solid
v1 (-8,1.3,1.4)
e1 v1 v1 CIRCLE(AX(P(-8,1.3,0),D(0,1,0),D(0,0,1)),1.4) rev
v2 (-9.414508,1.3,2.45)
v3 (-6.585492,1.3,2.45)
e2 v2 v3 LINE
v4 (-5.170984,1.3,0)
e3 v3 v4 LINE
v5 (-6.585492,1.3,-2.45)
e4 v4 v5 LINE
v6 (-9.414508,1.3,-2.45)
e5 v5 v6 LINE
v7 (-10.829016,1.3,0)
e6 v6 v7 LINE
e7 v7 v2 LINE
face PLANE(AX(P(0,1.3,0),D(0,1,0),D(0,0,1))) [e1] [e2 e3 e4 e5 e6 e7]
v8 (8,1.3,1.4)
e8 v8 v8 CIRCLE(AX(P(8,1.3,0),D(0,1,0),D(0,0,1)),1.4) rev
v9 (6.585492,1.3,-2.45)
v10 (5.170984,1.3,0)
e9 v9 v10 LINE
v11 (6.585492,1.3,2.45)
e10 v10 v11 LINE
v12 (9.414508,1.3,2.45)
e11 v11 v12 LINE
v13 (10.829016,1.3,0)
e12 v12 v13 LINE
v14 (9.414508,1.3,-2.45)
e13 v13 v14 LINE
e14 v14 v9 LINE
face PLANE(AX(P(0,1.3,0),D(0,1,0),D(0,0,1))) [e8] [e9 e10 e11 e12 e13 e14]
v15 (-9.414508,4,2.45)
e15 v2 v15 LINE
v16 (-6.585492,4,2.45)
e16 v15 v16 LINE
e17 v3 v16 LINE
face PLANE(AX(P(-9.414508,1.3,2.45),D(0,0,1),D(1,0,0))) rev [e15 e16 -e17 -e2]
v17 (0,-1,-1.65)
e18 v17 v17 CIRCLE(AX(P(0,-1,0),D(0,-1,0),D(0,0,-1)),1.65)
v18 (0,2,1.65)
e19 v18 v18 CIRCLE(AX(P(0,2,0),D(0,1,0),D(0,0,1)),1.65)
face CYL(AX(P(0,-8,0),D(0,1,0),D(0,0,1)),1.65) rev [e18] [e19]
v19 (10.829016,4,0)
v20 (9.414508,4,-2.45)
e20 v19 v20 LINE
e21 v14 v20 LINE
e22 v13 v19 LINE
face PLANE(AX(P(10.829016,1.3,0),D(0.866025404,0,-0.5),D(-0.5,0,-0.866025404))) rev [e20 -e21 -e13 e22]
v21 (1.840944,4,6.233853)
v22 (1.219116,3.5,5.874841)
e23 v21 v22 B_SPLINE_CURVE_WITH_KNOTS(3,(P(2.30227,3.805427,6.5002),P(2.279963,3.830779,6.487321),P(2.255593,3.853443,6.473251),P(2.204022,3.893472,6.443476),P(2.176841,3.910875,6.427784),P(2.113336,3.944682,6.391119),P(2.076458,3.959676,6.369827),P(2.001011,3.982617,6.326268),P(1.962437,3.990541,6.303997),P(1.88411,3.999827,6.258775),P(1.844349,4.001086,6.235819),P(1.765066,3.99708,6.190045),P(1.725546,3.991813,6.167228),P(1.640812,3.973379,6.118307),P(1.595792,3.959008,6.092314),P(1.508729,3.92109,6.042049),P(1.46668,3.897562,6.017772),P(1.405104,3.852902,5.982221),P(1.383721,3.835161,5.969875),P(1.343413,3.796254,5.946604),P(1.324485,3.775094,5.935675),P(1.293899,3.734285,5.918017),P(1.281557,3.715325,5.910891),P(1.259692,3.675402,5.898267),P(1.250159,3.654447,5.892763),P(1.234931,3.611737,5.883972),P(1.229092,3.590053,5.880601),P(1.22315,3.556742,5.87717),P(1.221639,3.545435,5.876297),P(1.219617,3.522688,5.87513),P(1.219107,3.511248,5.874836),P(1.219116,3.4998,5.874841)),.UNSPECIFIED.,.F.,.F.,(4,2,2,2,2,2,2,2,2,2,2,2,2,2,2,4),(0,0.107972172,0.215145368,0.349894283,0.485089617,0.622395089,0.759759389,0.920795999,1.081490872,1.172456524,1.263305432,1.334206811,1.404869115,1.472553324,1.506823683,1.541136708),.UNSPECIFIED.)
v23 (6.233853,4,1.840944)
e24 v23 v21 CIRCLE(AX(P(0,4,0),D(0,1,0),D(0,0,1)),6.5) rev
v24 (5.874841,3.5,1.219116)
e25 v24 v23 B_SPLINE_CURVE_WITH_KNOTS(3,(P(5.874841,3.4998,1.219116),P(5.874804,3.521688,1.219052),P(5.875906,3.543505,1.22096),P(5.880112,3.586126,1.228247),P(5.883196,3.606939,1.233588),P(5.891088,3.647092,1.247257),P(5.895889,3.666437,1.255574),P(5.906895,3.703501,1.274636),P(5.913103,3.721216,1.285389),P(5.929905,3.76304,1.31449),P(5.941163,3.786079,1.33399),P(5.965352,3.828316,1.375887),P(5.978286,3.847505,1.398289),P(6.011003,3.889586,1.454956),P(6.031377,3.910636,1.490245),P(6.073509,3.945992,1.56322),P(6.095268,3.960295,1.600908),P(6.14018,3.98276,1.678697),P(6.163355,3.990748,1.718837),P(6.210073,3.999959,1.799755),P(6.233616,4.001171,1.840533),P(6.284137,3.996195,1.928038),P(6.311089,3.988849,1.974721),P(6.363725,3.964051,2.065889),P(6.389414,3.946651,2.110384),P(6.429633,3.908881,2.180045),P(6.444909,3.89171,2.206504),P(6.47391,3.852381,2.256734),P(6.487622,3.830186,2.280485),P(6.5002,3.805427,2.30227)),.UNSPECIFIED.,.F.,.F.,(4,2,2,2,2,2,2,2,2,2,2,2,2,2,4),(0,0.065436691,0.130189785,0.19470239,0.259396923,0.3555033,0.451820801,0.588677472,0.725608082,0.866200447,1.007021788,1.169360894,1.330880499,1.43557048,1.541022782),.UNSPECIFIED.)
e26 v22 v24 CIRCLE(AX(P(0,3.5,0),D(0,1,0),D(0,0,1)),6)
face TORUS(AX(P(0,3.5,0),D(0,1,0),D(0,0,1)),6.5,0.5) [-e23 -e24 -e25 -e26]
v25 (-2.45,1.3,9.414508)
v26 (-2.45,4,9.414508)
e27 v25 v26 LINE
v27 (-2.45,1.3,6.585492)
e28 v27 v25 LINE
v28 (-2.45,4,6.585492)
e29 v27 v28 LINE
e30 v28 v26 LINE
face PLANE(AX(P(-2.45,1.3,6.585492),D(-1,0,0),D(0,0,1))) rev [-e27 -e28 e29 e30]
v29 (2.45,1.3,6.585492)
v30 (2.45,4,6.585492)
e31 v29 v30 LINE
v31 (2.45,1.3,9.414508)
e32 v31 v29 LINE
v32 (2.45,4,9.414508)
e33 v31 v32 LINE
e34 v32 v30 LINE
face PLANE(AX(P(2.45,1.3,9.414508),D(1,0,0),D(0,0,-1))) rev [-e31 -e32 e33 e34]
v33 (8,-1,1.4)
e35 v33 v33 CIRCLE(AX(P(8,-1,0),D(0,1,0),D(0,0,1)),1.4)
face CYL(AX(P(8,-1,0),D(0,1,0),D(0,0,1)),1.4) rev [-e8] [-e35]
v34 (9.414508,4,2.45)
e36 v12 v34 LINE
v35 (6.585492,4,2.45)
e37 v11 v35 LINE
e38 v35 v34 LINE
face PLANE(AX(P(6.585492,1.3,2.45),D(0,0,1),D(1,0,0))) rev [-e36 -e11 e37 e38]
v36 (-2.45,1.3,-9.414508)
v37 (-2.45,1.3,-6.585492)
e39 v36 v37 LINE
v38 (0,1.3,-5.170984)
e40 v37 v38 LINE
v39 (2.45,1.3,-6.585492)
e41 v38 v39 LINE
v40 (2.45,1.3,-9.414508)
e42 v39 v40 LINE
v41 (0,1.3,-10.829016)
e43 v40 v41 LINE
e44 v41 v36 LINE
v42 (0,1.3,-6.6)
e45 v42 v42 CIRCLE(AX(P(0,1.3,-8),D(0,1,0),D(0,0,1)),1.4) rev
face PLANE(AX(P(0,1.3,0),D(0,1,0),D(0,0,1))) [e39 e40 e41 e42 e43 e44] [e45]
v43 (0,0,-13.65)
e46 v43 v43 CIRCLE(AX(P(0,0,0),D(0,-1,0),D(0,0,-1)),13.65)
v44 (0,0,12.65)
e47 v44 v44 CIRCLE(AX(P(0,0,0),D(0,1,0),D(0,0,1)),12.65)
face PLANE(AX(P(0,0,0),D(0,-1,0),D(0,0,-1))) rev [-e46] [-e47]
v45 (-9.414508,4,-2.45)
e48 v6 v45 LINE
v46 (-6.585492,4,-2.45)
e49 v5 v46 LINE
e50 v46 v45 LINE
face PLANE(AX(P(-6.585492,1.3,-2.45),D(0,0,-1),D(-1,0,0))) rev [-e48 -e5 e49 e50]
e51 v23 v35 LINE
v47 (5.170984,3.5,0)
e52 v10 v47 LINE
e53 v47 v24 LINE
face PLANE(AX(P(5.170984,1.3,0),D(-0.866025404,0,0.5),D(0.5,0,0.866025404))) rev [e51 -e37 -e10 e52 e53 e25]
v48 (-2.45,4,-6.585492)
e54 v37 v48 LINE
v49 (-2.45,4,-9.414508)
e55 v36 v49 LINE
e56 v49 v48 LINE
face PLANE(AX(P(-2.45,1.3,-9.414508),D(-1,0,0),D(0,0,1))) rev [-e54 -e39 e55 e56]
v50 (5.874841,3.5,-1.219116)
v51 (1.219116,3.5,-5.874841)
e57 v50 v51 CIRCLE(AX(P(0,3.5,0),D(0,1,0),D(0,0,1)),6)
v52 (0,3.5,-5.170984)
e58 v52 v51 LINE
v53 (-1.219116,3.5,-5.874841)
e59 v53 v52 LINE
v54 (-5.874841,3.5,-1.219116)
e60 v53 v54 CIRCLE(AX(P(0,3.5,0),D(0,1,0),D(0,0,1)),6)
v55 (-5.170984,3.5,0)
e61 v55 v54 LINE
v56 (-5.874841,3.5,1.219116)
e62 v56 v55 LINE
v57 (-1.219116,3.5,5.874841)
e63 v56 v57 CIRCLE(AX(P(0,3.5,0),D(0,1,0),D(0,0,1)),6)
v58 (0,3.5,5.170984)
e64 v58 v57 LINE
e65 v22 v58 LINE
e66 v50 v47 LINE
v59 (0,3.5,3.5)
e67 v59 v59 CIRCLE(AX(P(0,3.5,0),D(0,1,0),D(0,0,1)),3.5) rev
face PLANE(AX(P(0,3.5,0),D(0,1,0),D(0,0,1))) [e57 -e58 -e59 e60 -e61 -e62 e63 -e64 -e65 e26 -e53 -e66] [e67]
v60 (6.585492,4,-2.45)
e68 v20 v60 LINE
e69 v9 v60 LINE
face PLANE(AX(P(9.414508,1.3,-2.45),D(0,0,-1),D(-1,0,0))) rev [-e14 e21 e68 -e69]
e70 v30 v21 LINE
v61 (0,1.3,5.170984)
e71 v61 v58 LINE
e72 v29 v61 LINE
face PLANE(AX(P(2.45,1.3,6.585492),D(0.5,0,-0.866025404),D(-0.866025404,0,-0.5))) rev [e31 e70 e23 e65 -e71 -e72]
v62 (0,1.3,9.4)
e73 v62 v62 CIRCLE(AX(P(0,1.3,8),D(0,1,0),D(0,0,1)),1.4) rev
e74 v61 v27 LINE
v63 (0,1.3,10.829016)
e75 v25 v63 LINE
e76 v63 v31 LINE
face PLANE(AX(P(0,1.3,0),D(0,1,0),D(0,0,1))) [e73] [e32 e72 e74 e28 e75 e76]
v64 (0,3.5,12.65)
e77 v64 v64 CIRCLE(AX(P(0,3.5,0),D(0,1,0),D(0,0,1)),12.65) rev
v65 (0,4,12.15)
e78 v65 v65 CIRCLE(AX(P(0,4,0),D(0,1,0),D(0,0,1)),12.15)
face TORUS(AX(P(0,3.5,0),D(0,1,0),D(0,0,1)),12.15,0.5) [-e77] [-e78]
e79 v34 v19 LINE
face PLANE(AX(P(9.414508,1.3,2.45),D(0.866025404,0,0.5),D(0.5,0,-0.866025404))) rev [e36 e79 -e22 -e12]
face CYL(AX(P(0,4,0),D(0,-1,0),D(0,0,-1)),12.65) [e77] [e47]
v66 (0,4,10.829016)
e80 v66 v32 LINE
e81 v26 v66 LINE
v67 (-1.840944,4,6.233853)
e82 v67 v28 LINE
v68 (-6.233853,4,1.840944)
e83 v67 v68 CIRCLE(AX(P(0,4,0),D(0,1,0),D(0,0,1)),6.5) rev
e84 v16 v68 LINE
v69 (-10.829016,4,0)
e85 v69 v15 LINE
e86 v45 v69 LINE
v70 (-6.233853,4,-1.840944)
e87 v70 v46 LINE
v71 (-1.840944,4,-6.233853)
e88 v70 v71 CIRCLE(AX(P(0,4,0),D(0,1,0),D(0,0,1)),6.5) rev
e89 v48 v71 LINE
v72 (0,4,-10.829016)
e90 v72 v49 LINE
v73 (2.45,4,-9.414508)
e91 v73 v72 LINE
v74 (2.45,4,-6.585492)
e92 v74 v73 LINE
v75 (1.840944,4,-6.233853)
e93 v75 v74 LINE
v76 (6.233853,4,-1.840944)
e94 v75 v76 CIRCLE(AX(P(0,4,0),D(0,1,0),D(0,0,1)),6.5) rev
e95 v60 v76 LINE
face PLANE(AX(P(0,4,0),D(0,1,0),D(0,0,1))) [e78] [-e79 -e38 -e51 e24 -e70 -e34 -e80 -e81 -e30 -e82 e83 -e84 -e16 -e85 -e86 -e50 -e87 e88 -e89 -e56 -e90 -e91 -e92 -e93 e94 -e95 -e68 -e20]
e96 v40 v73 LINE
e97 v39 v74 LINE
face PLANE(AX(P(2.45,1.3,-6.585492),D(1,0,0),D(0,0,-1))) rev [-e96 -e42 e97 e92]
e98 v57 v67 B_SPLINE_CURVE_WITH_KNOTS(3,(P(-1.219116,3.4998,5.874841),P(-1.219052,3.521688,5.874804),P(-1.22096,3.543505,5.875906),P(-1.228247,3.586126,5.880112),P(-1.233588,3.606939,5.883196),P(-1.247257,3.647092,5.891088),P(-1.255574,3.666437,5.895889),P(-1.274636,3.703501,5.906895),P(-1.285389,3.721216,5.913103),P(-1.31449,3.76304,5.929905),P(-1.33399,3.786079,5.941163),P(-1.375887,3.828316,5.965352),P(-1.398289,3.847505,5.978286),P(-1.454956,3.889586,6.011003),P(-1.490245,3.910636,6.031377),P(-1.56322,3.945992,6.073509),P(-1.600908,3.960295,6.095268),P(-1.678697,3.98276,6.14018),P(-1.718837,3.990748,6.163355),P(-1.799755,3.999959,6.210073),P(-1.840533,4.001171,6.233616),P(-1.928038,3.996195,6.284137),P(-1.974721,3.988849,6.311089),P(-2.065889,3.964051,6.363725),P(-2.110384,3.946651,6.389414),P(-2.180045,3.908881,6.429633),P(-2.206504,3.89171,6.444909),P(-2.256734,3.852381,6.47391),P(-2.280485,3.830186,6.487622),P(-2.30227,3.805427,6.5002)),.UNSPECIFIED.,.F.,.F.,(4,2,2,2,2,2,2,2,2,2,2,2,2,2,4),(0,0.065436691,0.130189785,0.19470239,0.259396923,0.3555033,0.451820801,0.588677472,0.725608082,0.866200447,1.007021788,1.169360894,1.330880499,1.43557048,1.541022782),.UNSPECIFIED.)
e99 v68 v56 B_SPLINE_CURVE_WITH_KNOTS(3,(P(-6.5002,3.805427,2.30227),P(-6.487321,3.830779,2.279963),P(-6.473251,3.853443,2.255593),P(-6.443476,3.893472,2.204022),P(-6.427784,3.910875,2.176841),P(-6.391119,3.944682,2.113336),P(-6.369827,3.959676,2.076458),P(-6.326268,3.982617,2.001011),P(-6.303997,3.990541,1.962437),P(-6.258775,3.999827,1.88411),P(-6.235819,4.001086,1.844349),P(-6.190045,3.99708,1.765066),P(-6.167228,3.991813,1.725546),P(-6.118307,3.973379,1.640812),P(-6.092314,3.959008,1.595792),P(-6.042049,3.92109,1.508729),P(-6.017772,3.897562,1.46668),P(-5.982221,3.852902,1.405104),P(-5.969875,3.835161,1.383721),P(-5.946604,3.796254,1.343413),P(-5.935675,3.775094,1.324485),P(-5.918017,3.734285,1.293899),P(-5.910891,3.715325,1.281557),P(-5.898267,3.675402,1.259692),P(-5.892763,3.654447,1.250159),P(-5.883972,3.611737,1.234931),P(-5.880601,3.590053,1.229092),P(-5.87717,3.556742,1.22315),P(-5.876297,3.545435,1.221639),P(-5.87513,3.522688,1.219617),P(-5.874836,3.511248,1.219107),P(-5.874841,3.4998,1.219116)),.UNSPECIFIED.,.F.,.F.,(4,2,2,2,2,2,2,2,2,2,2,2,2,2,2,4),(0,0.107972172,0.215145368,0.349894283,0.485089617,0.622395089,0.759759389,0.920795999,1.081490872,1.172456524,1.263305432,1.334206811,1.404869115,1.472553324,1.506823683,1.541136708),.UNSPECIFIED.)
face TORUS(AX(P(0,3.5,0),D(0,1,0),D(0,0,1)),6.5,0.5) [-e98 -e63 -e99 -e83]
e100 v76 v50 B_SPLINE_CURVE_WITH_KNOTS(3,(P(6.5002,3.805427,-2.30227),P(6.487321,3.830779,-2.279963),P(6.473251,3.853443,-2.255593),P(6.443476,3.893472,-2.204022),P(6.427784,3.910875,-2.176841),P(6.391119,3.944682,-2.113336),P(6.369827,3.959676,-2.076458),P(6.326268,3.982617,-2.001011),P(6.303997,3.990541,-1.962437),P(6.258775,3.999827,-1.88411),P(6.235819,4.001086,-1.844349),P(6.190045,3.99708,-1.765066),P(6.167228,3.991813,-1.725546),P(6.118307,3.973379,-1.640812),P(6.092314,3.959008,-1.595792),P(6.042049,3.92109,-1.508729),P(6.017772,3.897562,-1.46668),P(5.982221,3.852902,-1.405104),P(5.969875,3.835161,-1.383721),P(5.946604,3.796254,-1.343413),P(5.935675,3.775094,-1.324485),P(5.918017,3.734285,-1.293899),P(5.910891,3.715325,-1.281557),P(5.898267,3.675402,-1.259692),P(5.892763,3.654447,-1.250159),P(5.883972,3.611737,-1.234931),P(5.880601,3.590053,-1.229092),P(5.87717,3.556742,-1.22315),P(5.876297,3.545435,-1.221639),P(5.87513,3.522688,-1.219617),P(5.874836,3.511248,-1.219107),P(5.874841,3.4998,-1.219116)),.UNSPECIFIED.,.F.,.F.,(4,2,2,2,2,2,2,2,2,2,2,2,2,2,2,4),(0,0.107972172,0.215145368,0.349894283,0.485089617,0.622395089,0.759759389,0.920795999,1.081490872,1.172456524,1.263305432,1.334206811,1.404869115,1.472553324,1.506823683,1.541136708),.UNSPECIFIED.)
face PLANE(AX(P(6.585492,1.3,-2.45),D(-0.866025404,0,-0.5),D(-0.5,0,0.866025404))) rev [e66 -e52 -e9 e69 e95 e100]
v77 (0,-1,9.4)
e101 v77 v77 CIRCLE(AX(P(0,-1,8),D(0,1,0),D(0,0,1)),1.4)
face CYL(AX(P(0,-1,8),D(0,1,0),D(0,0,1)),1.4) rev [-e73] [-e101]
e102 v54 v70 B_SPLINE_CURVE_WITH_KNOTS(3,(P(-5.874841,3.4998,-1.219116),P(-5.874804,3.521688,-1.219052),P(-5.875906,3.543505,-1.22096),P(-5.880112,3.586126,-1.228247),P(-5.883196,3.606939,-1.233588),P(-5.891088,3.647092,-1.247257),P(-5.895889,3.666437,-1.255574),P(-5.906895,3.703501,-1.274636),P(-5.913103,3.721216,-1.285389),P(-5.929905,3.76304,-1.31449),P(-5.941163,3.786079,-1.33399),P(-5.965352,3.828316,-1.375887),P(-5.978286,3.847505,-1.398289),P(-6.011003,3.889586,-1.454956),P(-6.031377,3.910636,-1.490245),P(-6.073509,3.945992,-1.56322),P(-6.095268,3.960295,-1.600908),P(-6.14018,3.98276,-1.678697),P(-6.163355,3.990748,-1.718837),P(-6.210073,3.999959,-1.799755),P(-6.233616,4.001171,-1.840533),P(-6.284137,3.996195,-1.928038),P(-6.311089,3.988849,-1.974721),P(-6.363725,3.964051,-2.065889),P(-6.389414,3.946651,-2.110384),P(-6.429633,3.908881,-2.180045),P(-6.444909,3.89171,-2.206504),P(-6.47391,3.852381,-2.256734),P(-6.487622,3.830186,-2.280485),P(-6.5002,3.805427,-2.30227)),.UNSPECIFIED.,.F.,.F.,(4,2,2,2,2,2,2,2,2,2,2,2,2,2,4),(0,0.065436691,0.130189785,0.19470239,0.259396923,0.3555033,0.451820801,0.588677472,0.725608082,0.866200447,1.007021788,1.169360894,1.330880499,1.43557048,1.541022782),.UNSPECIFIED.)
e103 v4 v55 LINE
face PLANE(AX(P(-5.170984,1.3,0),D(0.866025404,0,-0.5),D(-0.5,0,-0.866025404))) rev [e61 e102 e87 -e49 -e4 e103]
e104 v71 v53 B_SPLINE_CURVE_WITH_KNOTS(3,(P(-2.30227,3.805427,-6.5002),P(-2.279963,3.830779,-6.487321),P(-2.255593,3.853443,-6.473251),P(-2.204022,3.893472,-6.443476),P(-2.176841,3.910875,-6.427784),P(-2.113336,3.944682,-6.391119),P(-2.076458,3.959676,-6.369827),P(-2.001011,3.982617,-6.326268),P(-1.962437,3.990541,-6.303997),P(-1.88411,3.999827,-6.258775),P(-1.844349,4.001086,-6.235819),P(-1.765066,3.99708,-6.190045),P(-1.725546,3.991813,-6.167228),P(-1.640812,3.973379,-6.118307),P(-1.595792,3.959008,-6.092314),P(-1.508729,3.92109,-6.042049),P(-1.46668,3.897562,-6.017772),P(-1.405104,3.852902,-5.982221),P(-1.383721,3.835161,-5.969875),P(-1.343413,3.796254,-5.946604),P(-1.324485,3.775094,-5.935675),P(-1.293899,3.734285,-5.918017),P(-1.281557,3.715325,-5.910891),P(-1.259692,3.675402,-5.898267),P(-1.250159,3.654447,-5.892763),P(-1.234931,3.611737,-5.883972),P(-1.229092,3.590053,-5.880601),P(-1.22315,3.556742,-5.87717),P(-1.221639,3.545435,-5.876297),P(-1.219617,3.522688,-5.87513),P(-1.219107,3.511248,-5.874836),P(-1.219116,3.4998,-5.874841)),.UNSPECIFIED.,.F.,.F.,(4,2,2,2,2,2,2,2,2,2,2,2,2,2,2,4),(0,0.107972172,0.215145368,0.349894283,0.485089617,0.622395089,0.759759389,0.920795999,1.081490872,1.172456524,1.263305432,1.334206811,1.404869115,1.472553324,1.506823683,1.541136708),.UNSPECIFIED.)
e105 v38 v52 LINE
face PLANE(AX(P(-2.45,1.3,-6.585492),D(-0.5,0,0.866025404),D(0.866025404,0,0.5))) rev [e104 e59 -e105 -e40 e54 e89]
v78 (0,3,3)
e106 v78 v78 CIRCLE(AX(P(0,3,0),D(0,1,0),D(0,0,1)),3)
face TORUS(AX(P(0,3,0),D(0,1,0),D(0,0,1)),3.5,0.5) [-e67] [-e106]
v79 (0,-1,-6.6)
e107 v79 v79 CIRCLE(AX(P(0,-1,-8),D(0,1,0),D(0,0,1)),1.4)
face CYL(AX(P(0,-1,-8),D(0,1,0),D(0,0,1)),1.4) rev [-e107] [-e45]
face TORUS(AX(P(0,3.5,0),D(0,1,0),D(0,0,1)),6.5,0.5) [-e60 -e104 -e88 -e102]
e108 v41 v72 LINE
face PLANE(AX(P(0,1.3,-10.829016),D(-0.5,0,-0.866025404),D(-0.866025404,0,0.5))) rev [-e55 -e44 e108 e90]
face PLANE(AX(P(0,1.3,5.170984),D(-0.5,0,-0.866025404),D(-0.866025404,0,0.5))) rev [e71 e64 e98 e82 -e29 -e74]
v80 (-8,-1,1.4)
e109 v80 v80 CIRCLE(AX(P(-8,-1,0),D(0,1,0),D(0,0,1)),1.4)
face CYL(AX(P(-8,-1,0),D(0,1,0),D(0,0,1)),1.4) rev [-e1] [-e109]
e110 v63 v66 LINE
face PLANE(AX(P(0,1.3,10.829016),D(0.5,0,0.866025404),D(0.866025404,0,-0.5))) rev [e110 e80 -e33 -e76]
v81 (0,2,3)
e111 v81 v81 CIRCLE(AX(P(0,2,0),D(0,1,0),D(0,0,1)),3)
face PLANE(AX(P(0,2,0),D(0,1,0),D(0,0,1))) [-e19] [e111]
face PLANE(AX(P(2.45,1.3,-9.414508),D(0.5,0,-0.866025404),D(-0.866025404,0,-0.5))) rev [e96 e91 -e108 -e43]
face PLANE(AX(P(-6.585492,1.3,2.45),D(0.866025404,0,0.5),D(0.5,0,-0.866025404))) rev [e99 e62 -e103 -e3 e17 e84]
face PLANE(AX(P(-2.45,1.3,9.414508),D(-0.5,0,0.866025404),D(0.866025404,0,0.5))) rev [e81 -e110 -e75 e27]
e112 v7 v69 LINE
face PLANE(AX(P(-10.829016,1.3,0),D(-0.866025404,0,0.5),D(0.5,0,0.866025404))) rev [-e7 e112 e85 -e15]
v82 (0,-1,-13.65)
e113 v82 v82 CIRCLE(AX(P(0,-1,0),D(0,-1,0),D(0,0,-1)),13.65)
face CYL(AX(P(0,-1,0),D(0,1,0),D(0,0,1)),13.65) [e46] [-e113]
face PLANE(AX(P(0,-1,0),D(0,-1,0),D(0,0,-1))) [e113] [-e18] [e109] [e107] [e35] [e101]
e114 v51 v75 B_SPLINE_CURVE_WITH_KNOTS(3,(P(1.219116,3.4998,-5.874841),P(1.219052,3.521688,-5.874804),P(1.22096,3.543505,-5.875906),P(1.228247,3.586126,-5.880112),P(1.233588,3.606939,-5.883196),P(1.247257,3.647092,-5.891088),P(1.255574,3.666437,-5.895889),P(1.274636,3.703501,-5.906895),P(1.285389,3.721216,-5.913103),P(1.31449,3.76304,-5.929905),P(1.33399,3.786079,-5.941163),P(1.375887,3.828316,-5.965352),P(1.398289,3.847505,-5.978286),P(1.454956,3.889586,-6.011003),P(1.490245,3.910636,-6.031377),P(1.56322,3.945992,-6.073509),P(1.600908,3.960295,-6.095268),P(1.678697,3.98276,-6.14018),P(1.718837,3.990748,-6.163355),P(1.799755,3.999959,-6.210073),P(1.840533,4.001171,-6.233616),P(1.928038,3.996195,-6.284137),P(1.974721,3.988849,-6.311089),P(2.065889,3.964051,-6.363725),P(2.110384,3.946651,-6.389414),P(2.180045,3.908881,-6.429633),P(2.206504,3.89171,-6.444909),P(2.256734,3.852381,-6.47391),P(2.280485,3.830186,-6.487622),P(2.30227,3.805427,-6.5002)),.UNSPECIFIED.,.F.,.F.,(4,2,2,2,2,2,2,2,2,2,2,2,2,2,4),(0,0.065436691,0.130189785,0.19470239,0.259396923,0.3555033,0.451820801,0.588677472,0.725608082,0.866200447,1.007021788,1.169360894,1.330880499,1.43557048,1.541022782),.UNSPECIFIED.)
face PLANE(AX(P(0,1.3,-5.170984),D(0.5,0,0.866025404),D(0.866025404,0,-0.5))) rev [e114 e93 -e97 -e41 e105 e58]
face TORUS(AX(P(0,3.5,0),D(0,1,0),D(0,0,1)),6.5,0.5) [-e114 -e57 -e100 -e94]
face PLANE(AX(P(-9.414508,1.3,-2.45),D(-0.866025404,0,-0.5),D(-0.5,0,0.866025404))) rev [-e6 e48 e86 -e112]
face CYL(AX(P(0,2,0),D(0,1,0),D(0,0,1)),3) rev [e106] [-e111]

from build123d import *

# Parameters (mm, degrees)
SKETCH1_R           = 12.65
BOSS_EXTRUDE1_DEPTH = 4
SKETCH4_R           = 6
CUT_EXTRUDE3_DEPTH  = 0.5
SKETCH5_R           = 3
CUT_EXTRUDE4_DEPTH  = 1.5
FILLET1_R           = 0.5
FILLET2_R           = 0.5
FILLET3_R           = 0.5
SKETCH7_R           = 13.65
BOSS_EXTRUDE2_DEPTH = 1
SKETCH8_R           = 1.4
CUT_EXTRUDE6_DEPTH  = 20.941038087
CUT_EXTRUDE7_DEPTH  = 2.7
SKETCH16_R          = 1.65
CUT_EXTRUDE8_DEPTH  = 10


with BuildPart() as part:
    # Sketch1 → Boss-Extrude1 (new body)
    with BuildSketch(Plane(origin=(0, 0, 0), x_dir=(1, 0, 0), z_dir=(0, 1, 0))):
        with Locations(Location((0, 0, 0), (0, 0, 270))):
            Circle(SKETCH1_R)
    extrude(amount=BOSS_EXTRUDE1_DEPTH)

    # Sketch4 → Cut-Extrude3 (cut)
    with BuildSketch(Plane(origin=(0, 4, 0), x_dir=(1, 0, 0), z_dir=(0, 1, 0))):
        with Locations(Location((0, 0, 0), (0, 0, 270))):
            Circle(SKETCH4_R)
    extrude(amount=-CUT_EXTRUDE3_DEPTH, mode=Mode.SUBTRACT)

    # Sketch5 → Cut-Extrude4 (cut)
    with BuildSketch(Plane(origin=(0, 3.5, 0), x_dir=(1, 0, 0), z_dir=(0, 1, 0))):
        with Locations(Location((0, 0, 0), (0, 0, 270))):
            Circle(SKETCH5_R)
    extrude(amount=-CUT_EXTRUDE4_DEPTH, mode=Mode.SUBTRACT)

    # Fillet1
    fillet1_edges = [part.edges().sort_by_distance(p)[0] for p in [
        (0, 4, -6),
    ]]
    fillet(fillet1_edges, radius=FILLET1_R - 0.0001)  # a hair under: the kernel refuses the full size

    # Fillet2
    fillet2_edges = [part.edges().sort_by_distance(p)[0] for p in [
        (0, 3.5, -3),
    ]]
    fillet(fillet2_edges, radius=FILLET2_R)

    # Fillet3
    fillet3_edges = [part.edges().sort_by_distance(p)[0] for p in [
        (0, 4, -12.65),
    ]]
    fillet(fillet3_edges, radius=FILLET3_R)

    # Sketch7 → Boss-Extrude2 (add)
    with BuildSketch(Plane.XZ):
        with Locations(Location((0, 0, 0), (0, 0, 270))):
            Circle(SKETCH7_R)
    extrude(amount=BOSS_EXTRUDE2_DEPTH)

    # Sketch8 → Cut-Extrude6 (cut, through all)
    with BuildSketch(Plane(origin=(0, 4, 0), x_dir=(1, 0, 0), z_dir=(0, 1, 0))):
        with Locations(Location((0, 8, 0), (0, 0, 270))):
            Circle(SKETCH8_R)
        with Locations(Location((8, 0, 0), (0, 0, 270))):
            Circle(SKETCH8_R)
        with Locations(Location((0, -8, 0), (0, 0, 270))):
            Circle(SKETCH8_R)
        with Locations(Location((-8, 0, 0), (0, 0, 270))):
            Circle(SKETCH8_R)
    extrude(amount=-CUT_EXTRUDE6_DEPTH, mode=Mode.SUBTRACT)

    # Sketch15 → Cut-Extrude7 (cut)
    with BuildSketch(Plane(origin=(0, 4, 0), x_dir=(1, 0, 0), z_dir=(0, 1, 0))):
        Polygon((5.170983681, 0), (6.58549184, -2.45), (9.41450816, -2.45), (10.829016319, 0), (9.41450816, 2.45), (6.58549184, 2.45), align=None)
        Polygon((0, 5.170983681), (2.45, 6.58549184), (2.45, 9.41450816), (0, 10.829016319), (-2.45, 9.41450816), (-2.45, 6.58549184), align=None)
        Polygon((0, -5.170983681), (-2.45, -6.58549184), (-2.45, -9.41450816), (0, -10.829016319), (2.45, -9.41450816), (2.45, -6.58549184), align=None)
        Polygon((-5.170983681, 0), (-6.58549184, 2.45), (-9.41450816, 2.45), (-10.829016319, 0), (-9.41450816, -2.45), (-6.58549184, -2.45), align=None)
    extrude(amount=-CUT_EXTRUDE7_DEPTH, mode=Mode.SUBTRACT)

    # Sketch16 → Cut-Extrude8 (cut)
    with BuildSketch(Plane(origin=(0, 2, 0), x_dir=(1, 0, 0), z_dir=(0, 1, 0))):
        with Locations(Location((0, 0, 0), (0, 0, 270))):
            Circle(SKETCH16_R)
    extrude(amount=-CUT_EXTRUDE8_DEPTH, mode=Mode.SUBTRACT)


solid = part.part
